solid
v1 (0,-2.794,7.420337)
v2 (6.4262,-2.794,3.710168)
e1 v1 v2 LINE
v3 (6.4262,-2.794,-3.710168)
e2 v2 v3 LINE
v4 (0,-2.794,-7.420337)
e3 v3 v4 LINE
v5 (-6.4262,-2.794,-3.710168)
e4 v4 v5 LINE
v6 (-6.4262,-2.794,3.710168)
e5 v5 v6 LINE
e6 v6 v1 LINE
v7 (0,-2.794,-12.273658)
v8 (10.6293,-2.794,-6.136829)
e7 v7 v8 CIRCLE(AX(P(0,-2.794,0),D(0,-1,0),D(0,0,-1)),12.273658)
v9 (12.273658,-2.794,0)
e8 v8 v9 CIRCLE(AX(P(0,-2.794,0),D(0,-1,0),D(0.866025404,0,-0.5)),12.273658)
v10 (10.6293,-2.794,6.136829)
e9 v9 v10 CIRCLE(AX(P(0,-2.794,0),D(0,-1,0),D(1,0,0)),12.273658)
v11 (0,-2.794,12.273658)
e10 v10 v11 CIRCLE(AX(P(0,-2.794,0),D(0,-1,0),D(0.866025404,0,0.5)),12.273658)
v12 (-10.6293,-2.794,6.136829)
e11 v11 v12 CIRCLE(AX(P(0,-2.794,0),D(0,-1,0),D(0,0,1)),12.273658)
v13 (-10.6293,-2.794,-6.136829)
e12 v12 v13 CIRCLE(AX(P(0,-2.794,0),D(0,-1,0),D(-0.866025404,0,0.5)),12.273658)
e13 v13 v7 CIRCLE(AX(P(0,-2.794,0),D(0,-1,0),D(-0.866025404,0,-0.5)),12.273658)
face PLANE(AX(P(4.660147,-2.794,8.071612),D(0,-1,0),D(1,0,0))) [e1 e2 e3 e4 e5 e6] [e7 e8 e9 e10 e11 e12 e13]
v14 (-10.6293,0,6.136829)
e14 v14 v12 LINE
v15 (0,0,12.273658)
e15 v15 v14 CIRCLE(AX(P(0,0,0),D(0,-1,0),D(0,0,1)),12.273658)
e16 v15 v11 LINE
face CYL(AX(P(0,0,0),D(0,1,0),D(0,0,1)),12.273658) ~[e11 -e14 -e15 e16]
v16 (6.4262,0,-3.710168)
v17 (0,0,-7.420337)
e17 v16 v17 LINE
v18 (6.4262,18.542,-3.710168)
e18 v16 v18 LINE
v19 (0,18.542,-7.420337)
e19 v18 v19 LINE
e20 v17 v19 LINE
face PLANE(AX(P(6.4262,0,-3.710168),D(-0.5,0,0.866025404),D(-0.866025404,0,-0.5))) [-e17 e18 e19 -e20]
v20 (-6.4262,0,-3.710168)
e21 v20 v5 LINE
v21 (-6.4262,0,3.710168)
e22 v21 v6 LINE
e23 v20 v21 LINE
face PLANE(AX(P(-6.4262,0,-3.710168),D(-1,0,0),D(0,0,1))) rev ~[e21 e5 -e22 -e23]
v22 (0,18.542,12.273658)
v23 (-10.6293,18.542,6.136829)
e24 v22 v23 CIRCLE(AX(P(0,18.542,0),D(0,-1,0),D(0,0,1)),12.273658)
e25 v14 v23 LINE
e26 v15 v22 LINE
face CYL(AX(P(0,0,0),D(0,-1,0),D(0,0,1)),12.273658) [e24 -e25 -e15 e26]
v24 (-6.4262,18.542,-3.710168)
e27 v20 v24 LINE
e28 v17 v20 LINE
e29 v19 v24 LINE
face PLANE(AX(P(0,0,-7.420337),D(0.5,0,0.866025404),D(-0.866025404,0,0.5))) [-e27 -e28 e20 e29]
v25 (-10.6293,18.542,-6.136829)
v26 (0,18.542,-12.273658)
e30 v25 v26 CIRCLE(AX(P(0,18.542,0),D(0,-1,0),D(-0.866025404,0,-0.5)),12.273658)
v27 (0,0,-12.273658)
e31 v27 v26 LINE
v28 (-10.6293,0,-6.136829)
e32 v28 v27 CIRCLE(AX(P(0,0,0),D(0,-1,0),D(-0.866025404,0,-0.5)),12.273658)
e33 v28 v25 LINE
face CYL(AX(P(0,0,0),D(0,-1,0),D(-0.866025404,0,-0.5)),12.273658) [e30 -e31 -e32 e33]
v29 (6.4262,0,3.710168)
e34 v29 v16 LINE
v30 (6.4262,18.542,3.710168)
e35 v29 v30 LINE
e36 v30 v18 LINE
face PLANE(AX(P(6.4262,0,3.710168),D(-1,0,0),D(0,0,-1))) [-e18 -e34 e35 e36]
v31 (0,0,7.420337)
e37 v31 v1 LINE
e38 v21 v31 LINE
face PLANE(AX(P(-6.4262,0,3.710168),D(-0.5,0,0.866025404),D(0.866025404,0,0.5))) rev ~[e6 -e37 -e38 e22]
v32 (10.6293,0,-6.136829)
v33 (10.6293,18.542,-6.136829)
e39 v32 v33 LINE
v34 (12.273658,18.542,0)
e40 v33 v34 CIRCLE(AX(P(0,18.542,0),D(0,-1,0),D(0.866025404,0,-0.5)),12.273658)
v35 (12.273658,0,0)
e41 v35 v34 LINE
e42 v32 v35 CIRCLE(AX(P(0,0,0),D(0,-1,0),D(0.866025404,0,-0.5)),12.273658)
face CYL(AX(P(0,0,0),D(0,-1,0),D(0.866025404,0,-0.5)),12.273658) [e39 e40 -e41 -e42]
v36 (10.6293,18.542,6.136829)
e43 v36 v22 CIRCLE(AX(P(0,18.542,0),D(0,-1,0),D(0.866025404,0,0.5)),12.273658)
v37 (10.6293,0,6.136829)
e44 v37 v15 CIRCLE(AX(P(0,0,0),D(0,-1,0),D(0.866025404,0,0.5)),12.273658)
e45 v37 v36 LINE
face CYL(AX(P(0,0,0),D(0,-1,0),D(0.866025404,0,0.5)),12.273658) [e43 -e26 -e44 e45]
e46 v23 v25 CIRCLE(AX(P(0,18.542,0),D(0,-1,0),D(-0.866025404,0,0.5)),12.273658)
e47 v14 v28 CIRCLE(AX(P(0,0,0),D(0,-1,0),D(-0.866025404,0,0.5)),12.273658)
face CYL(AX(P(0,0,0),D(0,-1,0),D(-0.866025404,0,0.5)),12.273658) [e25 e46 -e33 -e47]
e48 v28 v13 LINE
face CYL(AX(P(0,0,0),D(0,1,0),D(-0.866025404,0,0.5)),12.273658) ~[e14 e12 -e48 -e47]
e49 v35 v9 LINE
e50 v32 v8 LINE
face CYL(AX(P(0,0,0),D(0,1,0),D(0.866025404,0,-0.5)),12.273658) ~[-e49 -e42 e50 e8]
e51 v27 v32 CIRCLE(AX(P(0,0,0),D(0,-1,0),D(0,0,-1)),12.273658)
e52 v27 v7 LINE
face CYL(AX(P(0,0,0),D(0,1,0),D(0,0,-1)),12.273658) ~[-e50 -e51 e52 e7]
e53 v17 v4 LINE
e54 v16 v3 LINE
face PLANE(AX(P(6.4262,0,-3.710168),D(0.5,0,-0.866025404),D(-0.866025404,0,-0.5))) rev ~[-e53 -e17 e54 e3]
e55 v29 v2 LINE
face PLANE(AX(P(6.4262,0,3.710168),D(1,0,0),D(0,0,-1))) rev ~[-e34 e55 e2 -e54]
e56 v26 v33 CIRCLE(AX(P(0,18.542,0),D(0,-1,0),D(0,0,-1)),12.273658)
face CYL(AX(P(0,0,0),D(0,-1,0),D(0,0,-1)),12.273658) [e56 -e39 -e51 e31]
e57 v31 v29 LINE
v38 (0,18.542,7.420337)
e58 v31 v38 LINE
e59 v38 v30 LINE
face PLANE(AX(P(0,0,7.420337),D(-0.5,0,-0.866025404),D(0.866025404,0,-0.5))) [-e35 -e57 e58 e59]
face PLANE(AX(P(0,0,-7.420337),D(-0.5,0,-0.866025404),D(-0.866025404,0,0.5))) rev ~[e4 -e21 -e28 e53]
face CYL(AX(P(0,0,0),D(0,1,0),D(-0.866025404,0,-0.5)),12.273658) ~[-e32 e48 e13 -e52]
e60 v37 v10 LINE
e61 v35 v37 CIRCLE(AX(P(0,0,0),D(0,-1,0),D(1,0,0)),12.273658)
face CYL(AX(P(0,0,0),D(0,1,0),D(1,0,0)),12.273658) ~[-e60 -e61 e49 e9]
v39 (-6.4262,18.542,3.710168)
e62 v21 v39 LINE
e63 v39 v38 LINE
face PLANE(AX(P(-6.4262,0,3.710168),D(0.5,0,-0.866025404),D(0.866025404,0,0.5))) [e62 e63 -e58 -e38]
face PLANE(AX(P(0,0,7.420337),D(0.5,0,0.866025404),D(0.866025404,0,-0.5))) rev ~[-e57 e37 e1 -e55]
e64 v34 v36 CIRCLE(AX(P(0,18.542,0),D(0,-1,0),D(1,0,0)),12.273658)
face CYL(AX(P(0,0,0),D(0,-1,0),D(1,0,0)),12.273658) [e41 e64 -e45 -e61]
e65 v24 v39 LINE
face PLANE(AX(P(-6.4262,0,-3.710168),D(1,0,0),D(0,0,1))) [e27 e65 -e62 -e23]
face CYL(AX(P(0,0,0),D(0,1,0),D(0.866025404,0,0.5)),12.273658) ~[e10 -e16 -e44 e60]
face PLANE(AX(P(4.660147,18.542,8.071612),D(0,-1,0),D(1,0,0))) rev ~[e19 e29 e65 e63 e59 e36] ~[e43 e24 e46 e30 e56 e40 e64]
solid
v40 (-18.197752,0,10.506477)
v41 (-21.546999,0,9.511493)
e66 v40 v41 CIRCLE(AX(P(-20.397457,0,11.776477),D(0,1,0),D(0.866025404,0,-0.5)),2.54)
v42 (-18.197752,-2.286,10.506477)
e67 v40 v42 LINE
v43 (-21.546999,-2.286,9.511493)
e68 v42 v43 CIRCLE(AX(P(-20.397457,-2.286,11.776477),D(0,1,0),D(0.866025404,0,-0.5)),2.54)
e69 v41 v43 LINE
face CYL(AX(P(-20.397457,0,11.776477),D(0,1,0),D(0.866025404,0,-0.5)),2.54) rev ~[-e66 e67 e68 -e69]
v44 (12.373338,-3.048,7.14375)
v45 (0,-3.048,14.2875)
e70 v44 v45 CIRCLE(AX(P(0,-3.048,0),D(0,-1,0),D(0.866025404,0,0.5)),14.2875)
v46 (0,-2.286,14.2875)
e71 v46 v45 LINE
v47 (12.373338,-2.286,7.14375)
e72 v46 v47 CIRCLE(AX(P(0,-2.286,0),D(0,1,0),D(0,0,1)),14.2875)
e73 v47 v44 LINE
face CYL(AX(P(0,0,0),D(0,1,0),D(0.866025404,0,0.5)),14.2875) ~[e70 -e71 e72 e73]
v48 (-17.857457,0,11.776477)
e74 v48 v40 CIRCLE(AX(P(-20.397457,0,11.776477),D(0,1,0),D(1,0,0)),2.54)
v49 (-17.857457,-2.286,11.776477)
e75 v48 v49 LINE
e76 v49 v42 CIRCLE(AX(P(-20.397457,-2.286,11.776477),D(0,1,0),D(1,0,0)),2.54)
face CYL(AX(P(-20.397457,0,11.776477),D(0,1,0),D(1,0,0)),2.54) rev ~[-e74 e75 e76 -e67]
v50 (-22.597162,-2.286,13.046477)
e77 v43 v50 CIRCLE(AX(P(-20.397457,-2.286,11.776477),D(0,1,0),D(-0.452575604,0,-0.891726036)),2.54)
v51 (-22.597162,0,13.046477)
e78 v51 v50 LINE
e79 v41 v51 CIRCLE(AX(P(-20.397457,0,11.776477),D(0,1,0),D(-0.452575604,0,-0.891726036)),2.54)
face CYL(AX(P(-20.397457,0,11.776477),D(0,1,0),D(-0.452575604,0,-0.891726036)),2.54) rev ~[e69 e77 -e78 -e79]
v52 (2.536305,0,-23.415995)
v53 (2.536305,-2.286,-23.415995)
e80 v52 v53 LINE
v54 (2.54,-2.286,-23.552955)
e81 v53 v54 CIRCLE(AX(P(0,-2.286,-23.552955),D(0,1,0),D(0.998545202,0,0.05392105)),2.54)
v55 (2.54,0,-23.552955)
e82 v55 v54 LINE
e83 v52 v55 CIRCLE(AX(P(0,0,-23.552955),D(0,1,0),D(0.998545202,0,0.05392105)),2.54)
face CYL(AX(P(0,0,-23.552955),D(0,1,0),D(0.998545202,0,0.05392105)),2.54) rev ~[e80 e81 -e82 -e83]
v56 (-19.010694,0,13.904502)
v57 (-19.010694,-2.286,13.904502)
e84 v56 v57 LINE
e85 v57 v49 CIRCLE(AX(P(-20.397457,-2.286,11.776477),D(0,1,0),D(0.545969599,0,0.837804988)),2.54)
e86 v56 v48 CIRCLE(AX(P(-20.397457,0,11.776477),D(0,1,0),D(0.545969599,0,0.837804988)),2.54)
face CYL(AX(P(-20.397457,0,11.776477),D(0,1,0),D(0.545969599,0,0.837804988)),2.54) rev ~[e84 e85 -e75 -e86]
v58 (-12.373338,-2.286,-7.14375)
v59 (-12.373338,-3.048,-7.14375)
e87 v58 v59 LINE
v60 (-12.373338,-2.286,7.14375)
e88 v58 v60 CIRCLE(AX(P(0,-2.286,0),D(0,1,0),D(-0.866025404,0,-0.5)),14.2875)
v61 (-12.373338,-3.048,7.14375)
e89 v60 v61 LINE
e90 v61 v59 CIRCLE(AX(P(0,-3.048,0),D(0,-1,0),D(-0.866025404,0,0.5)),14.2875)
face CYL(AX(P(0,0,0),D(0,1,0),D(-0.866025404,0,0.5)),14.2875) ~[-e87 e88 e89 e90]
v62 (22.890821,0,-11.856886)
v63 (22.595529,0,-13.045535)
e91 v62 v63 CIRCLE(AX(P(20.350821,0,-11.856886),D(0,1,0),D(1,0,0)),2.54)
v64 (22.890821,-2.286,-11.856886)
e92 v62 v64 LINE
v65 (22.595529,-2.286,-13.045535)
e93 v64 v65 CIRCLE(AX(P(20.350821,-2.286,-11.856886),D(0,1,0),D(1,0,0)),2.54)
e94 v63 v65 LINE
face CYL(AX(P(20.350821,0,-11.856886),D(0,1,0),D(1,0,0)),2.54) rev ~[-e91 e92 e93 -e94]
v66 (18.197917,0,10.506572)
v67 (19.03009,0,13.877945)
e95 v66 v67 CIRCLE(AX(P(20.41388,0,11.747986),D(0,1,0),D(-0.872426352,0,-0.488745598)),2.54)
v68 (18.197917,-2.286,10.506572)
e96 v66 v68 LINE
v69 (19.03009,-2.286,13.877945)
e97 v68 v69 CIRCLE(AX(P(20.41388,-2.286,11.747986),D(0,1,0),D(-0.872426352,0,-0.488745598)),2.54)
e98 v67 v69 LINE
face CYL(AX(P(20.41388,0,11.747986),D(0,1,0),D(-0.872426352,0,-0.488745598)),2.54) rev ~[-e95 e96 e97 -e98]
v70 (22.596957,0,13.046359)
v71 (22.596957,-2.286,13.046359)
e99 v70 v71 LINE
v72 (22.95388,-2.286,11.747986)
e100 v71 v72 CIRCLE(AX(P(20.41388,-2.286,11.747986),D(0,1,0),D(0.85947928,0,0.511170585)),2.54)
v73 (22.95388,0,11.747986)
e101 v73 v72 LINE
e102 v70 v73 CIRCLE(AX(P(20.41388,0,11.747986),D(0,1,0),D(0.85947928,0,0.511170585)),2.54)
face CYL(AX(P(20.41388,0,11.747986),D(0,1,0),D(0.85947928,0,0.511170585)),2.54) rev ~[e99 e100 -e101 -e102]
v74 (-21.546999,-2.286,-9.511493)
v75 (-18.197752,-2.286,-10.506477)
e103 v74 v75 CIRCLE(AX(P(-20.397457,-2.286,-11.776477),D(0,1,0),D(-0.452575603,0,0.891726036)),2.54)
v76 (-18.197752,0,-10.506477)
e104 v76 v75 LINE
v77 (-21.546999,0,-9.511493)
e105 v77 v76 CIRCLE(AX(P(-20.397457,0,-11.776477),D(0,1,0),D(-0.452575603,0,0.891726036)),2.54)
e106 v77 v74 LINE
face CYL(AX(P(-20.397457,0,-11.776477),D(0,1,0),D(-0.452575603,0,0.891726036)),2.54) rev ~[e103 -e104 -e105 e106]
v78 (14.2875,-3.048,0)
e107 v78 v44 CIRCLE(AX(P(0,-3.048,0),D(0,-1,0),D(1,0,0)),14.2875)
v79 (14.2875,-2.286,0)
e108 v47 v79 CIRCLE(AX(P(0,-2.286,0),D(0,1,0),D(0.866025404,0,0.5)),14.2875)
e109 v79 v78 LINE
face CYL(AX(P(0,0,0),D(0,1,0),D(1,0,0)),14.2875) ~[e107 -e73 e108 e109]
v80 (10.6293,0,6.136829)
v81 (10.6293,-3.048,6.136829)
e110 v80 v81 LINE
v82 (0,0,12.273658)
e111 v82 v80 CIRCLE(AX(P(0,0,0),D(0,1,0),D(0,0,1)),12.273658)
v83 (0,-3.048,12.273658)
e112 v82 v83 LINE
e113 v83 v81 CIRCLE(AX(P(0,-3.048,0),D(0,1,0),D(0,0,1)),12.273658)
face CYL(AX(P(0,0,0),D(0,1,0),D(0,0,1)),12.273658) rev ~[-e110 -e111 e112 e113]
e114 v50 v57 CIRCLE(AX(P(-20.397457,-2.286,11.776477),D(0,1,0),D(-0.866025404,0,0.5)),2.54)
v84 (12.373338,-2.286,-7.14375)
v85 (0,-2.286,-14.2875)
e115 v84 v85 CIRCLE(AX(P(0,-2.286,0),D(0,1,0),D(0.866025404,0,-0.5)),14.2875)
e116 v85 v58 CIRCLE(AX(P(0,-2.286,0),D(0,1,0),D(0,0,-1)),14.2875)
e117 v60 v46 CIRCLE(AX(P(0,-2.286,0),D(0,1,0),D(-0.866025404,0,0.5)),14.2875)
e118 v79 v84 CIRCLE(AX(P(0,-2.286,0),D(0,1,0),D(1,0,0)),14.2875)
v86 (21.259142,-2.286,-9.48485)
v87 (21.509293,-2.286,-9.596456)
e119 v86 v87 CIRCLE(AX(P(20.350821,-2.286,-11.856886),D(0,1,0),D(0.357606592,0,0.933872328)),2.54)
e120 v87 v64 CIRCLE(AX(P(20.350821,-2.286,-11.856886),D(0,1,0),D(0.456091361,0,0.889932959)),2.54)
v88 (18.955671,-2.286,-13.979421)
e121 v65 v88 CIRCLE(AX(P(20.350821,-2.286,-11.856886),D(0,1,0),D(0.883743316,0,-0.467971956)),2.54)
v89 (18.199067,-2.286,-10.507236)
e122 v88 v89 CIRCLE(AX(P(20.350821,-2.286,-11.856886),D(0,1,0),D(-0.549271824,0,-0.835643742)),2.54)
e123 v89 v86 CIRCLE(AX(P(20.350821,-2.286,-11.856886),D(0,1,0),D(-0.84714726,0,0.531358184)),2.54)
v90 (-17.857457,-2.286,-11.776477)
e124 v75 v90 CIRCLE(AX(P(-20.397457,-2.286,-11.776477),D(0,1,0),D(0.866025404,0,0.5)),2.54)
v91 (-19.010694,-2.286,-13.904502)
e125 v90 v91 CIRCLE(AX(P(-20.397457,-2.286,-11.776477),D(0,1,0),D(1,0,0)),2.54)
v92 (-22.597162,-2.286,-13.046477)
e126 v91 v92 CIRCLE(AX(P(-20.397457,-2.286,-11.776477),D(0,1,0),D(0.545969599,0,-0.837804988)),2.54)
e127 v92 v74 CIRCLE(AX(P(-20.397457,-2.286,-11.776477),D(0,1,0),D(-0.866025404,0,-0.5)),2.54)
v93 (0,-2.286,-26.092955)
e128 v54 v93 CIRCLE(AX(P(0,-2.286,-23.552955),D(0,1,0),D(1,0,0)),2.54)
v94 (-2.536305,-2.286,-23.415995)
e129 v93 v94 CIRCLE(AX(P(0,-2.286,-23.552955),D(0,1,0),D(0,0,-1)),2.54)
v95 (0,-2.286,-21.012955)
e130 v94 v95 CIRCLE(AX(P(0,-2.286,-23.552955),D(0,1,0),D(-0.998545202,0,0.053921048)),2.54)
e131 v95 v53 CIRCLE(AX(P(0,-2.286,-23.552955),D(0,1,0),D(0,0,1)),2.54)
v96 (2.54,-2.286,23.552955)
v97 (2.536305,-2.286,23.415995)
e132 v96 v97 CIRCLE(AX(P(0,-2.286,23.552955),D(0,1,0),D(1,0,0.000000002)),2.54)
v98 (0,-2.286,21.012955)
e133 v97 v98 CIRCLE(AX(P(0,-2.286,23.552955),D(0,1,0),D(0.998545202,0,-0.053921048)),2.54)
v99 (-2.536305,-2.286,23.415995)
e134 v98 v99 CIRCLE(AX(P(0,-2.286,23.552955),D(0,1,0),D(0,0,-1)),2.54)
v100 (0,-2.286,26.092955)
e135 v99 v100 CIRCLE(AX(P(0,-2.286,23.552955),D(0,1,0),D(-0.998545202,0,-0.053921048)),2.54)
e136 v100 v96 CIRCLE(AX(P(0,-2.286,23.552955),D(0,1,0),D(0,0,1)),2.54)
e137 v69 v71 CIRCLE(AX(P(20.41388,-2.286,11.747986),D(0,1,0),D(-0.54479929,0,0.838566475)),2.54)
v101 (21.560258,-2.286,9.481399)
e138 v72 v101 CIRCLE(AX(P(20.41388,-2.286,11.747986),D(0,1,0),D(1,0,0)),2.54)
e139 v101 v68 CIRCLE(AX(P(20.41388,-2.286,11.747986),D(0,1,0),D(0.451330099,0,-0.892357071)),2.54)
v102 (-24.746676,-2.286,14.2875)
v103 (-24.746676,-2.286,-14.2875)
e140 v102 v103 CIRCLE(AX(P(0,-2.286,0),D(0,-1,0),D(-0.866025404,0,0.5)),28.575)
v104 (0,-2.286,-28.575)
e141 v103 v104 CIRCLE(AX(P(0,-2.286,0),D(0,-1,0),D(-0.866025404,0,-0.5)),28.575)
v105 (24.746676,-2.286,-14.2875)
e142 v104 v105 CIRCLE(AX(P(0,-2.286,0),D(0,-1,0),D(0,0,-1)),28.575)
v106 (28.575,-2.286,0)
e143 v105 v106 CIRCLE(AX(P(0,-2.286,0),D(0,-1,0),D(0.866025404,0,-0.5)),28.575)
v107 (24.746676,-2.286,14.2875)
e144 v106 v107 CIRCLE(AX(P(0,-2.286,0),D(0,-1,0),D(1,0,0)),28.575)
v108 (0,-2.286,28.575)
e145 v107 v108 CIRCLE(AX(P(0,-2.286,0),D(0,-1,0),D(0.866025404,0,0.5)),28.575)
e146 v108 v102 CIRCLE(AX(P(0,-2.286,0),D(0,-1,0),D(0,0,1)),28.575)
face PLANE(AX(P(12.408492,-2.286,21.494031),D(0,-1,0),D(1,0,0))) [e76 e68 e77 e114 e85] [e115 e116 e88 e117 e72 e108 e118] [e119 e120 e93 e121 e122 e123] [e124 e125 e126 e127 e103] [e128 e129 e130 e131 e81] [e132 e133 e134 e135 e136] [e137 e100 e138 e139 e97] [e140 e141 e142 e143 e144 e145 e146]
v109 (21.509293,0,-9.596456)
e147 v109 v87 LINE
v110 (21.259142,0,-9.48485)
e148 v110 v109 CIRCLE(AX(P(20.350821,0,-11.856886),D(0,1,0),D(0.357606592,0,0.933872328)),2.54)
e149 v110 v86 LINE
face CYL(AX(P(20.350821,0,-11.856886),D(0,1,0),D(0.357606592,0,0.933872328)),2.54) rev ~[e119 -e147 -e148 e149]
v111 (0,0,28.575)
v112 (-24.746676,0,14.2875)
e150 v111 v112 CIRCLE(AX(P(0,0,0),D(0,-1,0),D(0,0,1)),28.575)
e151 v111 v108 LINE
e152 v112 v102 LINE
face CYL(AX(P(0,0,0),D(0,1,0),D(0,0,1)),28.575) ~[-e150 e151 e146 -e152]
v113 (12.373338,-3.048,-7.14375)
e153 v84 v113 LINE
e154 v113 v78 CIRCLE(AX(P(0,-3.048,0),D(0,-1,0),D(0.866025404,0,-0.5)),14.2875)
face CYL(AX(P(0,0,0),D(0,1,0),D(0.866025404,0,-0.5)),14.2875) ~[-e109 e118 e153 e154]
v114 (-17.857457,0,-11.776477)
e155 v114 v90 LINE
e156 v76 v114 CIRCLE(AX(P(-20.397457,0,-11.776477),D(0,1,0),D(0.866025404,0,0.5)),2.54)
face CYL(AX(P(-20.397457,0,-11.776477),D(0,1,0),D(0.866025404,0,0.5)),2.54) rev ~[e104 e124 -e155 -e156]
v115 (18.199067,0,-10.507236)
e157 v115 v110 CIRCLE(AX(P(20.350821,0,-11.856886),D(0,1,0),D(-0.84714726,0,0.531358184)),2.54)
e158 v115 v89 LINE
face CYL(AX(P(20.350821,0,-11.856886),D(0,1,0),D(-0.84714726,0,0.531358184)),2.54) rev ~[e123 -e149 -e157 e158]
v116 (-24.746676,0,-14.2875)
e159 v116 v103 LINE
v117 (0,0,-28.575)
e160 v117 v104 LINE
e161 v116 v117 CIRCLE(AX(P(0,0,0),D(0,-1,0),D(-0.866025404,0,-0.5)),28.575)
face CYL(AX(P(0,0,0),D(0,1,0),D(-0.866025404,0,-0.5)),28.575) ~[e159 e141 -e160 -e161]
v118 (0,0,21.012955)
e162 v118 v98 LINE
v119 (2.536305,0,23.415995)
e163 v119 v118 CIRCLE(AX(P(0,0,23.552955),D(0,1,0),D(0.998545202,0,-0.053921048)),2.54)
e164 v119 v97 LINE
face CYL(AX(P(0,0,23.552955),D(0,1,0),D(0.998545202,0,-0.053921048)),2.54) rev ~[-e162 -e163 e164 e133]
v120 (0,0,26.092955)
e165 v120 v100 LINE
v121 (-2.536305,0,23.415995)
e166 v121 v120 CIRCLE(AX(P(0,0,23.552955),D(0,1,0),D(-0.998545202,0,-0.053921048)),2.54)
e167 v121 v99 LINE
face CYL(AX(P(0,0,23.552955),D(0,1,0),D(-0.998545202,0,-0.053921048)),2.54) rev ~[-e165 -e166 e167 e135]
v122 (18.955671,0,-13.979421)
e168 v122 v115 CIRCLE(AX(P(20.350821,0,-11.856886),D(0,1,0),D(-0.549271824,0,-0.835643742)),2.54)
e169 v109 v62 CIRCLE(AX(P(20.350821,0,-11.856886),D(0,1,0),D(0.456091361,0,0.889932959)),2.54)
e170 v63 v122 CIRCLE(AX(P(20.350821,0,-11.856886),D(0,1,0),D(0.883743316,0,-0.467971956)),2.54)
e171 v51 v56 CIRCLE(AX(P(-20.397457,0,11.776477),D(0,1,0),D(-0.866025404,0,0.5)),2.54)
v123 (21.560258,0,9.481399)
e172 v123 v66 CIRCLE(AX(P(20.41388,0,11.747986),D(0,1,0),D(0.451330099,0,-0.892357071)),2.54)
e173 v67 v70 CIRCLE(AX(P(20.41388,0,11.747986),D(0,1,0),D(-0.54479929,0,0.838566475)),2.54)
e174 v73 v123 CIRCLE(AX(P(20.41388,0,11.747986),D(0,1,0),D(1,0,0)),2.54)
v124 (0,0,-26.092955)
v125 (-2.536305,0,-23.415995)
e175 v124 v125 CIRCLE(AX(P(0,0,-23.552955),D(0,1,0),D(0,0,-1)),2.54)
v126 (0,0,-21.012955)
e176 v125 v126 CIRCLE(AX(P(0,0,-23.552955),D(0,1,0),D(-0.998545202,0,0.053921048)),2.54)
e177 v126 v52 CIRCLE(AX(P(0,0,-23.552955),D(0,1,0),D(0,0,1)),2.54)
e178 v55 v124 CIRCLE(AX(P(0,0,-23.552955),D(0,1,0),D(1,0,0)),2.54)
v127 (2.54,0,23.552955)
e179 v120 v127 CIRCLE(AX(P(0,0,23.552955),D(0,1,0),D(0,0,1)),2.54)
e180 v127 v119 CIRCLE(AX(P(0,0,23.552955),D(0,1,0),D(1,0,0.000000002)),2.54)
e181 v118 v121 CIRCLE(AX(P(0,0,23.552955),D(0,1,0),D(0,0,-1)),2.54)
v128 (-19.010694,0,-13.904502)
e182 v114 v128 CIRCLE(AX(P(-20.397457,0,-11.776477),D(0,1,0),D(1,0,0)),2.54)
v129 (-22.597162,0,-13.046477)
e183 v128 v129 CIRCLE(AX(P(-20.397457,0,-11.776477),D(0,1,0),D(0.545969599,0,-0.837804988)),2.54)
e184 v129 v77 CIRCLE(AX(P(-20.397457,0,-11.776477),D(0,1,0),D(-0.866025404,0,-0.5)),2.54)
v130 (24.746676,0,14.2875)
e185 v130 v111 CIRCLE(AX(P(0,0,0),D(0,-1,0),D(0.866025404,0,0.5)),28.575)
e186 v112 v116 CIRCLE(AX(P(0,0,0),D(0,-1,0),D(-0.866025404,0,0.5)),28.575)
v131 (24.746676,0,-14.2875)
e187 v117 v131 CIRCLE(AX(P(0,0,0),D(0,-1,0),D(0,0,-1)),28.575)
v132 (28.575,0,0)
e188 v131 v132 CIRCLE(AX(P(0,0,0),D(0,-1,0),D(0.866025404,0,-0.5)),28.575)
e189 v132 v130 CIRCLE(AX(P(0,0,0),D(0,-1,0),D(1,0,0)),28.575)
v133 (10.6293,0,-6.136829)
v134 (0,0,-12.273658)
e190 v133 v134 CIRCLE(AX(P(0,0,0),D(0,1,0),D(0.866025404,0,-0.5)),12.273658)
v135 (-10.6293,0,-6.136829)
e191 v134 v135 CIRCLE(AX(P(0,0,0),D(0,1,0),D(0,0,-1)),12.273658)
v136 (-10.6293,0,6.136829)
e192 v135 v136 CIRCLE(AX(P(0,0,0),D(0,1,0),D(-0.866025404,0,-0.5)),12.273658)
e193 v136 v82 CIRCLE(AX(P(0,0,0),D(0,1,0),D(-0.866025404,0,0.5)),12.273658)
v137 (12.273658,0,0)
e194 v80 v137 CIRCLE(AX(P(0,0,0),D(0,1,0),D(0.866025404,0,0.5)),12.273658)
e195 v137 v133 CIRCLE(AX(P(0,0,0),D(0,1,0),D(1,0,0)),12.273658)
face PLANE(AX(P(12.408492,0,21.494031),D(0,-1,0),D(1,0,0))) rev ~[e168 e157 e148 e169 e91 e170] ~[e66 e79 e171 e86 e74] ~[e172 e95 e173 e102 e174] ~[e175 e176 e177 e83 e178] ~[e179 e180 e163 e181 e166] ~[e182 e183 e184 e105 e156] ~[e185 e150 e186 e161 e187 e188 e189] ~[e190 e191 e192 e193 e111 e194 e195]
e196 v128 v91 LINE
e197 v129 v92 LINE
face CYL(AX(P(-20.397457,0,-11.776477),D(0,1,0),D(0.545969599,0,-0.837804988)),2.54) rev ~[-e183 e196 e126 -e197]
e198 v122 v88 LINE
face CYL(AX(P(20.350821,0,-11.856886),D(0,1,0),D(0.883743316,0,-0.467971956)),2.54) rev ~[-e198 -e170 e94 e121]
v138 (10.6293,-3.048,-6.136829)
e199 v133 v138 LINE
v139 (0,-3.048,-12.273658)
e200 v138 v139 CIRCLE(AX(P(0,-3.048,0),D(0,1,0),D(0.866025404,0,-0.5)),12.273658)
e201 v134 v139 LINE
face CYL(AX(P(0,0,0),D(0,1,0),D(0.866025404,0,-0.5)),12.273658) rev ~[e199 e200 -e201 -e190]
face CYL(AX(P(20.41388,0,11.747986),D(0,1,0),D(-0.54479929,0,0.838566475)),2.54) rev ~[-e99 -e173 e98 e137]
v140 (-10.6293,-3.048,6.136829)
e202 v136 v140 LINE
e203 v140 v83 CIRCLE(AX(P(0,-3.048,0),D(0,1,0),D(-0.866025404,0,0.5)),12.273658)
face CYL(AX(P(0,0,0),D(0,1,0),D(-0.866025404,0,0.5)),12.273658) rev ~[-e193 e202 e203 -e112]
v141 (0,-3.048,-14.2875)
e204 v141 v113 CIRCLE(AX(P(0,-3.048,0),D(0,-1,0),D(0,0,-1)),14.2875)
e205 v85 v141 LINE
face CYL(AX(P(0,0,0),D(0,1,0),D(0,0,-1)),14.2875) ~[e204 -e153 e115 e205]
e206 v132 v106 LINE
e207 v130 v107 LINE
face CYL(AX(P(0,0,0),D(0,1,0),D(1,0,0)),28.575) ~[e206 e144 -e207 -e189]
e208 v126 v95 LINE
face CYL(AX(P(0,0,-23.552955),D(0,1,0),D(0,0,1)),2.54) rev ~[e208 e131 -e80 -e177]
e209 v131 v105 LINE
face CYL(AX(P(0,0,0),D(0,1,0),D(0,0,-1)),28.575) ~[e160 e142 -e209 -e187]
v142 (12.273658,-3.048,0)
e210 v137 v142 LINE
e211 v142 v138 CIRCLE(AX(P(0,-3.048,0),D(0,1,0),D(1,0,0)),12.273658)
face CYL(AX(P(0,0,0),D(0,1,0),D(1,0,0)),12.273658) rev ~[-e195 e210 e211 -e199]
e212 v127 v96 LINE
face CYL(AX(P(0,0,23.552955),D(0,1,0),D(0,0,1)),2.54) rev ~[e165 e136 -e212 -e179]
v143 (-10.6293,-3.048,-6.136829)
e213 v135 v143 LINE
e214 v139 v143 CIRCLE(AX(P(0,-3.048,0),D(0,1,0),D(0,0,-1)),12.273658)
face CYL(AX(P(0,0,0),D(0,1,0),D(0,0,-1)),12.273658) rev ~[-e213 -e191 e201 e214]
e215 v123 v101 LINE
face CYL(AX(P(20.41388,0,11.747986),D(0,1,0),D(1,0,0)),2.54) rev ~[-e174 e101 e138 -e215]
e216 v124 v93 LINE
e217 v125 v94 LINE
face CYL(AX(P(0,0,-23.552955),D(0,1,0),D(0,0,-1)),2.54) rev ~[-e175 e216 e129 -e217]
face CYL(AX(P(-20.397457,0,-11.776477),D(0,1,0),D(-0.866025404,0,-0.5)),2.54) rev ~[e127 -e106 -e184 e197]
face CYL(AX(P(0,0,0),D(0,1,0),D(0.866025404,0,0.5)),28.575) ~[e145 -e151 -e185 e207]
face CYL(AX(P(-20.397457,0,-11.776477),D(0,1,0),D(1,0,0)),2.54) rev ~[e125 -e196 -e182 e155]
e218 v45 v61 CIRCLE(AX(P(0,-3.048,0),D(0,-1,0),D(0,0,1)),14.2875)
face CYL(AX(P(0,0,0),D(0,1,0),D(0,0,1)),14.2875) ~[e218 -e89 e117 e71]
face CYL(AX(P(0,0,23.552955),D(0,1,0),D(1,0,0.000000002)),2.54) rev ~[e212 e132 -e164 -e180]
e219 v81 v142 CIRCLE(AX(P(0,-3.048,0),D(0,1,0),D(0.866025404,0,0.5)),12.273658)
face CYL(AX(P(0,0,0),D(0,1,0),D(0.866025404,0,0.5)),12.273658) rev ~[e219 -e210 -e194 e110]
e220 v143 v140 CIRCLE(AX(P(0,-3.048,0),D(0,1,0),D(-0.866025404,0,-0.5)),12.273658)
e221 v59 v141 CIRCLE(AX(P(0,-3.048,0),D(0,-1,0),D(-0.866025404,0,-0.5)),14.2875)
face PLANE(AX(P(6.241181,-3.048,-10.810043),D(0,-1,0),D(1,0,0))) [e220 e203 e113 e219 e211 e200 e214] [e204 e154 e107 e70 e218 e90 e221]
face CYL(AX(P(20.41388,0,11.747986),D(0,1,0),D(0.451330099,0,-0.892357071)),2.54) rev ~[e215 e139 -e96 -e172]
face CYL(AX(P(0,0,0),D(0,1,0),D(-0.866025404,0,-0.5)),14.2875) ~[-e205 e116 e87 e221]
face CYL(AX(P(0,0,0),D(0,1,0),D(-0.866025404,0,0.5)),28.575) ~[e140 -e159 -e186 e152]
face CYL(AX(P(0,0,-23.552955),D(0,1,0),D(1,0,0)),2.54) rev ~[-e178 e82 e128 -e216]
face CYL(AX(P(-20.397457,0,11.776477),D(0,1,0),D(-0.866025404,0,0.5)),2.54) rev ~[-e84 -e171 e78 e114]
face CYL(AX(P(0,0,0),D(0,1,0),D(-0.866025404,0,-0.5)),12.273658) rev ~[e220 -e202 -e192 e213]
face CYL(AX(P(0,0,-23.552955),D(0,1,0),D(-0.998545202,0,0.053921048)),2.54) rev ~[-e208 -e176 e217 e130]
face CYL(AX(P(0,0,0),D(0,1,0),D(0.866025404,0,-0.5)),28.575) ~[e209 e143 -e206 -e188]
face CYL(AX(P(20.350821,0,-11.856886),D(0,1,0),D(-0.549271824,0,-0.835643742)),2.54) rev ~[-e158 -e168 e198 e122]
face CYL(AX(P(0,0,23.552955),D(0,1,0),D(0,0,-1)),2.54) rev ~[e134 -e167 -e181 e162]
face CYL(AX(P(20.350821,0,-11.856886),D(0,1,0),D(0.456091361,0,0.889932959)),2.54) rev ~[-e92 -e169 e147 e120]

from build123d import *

# Parameters (mm, degrees)
F1_DEPTH = 18.542
F2_DEPTH = 3.048
F3_DEPTH = 2.286
F4_DEPTH = 2.286
F6_DEPTH = 2.794


# Not quite as in the source:
# - a feature of the source that left no trace in its solid (it failed there, or was rolled back) is left out


with BuildPart() as f1:
    # F0 (on Front) → F1 (new body)
    with BuildSketch(Plane.XZ):
        with BuildLine():
            Line((6.4262, 3.7101682999), (10.6292995539, 6.1368289587))
            ThreePointArc((10.6292995539, 6.1368289587), (6.1368289587, 10.6292995539), (0, 12.2736579174))
            Line((0, 12.2736579174), (0, 7.4203365997))
            Line((0, 7.4203365997), (6.4262, 3.7101682999))
        make_face()
        with BuildLine():
            ThreePointArc((12.2736579174, 0), (11.8554431655, 3.1766564221), (10.6292995539, 6.1368289587))
            Line((10.6292995539, 6.1368289587), (6.4262, 3.7101682999))
            Line((6.4262, 3.7101682999), (6.4262, -2.8670745859))
            Line((6.4262, -2.8670745859), (6.4262, -3.7101682999))
            Line((6.4262, -3.7101682999), (10.6292995539, -6.1368289587))
            ThreePointArc((10.6292995539, -6.1368289587), (11.8554431655, -3.1766564221), (12.2736579174, 0))
        make_face()
        with BuildLine():
            ThreePointArc((0, -12.2736579174), (6.1368289587, -10.6292995539), (10.6292995539, -6.1368289587))
            Line((10.6292995539, -6.1368289587), (6.4262, -3.7101682999))
            Line((6.4262, -3.7101682999), (0, -7.4203365997))
            Line((0, -7.4203365997), (0, -12.2736579174))
        make_face()
        with BuildLine():
            Line((0, 7.4203365997), (0, 12.2736579174))
            ThreePointArc((0, 12.2736579174), (-6.1368289587, 10.6292995539), (-10.6292995539, 6.1368289587))
            Line((-10.6292995539, 6.1368289587), (-6.4262, 3.7101682999))
            Line((-6.4262, 3.7101682999), (0, 7.4203365997))
        make_face()
        with BuildLine():
            ThreePointArc((-10.6292995539, -6.1368289587), (-6.1368289587, -10.6292995539), (0, -12.2736579174))
            Line((0, -12.2736579174), (0, -7.4203365997))
            Line((0, -7.4203365997), (-6.4262, -3.7101682999))
            Line((-6.4262, -3.7101682999), (-10.6292995539, -6.1368289587))
        make_face()
        with BuildLine():
            Line((-6.4262, 3.7101682999), (-10.6292995539, 6.1368289587))
            ThreePointArc((-10.6292995539, 6.1368289587), (-12.2736579174, 0), (-10.6292995539, -6.1368289587))
            Line((-10.6292995539, -6.1368289587), (-6.4262, -3.7101682999))
            Line((-6.4262, -3.7101682999), (-6.4262, 3.7101682999))
        make_face()
    extrude(amount=-F1_DEPTH)

    # F0 (on Front) → F6 (join)
    with BuildSketch(Plane.XZ):
        with BuildLine():
            Line((6.4262, 3.7101682999), (10.6292995539, 6.1368289587))
            ThreePointArc((10.6292995539, 6.1368289587), (6.1368289587, 10.6292995539), (0, 12.2736579174))
            Line((0, 12.2736579174), (0, 7.4203365997))
            Line((0, 7.4203365997), (6.4262, 3.7101682999))
        make_face()
        with BuildLine():
            ThreePointArc((12.2736579174, 0), (11.8554431655, 3.1766564221), (10.6292995539, 6.1368289587))
            Line((10.6292995539, 6.1368289587), (6.4262, 3.7101682999))
            Line((6.4262, 3.7101682999), (6.4262, -2.8670745859))
            Line((6.4262, -2.8670745859), (6.4262, -3.7101682999))
            Line((6.4262, -3.7101682999), (10.6292995539, -6.1368289587))
            ThreePointArc((10.6292995539, -6.1368289587), (11.8554431655, -3.1766564221), (12.2736579174, 0))
        make_face()
        with BuildLine():
            ThreePointArc((0, -12.2736579174), (6.1368289587, -10.6292995539), (10.6292995539, -6.1368289587))
            Line((10.6292995539, -6.1368289587), (6.4262, -3.7101682999))
            Line((6.4262, -3.7101682999), (0, -7.4203365997))
            Line((0, -7.4203365997), (0, -12.2736579174))
        make_face()
        with BuildLine():
            Line((0, 7.4203365997), (0, 12.2736579174))
            ThreePointArc((0, 12.2736579174), (-6.1368289587, 10.6292995539), (-10.6292995539, 6.1368289587))
            Line((-10.6292995539, 6.1368289587), (-6.4262, 3.7101682999))
            Line((-6.4262, 3.7101682999), (0, 7.4203365997))
        make_face()
        with BuildLine():
            ThreePointArc((-10.6292995539, -6.1368289587), (-6.1368289587, -10.6292995539), (0, -12.2736579174))
            Line((0, -12.2736579174), (0, -7.4203365997))
            Line((0, -7.4203365997), (-6.4262, -3.7101682999))
            Line((-6.4262, -3.7101682999), (-10.6292995539, -6.1368289587))
        make_face()
        with BuildLine():
            Line((-6.4262, 3.7101682999), (-10.6292995539, 6.1368289587))
            ThreePointArc((-10.6292995539, 6.1368289587), (-12.2736579174, 0), (-10.6292995539, -6.1368289587))
            Line((-10.6292995539, -6.1368289587), (-6.4262, -3.7101682999))
            Line((-6.4262, -3.7101682999), (-6.4262, 3.7101682999))
        make_face()
    extrude(amount=F6_DEPTH)


with BuildPart() as f2:
    # F0 (on Front) → F2 (new body)
    with BuildSketch(Plane.XZ):
        with BuildLine():
            ThreePointArc((0, -14.2875), (7.14375, -12.3733379566), (12.3733379566, -7.14375))
            Line((12.3733379566, -7.14375), (10.6292995539, -6.1368289587))
            ThreePointArc((10.6292995539, -6.1368289587), (6.1368289587, -10.6292995539), (0, -12.2736579174))
            Line((0, -12.2736579174), (0, -14.2875))
        make_face()
        with BuildLine():
            ThreePointArc((-12.3733379566, -7.14375), (-7.14375, -12.3733379566), (0, -14.2875))
            Line((0, -14.2875), (0, -12.2736579174))
            ThreePointArc((0, -12.2736579174), (-6.1368289587, -10.6292995539), (-10.6292995539, -6.1368289587))
            Line((-10.6292995539, -6.1368289587), (-12.3733379566, -7.14375))
        make_face()
        with BuildLine():
            Line((-10.6292995539, 6.1368289587), (-12.3733379566, 7.14375))
            ThreePointArc((-12.3733379566, 7.14375), (-14.2875, 0), (-12.3733379566, -7.14375))
            Line((-12.3733379566, -7.14375), (-10.6292995539, -6.1368289587))
            ThreePointArc((-10.6292995539, -6.1368289587), (-12.2736579174, 0), (-10.6292995539, 6.1368289587))
        make_face()
        with BuildLine():
            Line((0, 12.2736579174), (0, 14.2875))
            ThreePointArc((0, 14.2875), (-7.14375, 12.3733379566), (-12.3733379566, 7.14375))
            Line((-12.3733379566, 7.14375), (-10.6292995539, 6.1368289587))
            ThreePointArc((-10.6292995539, 6.1368289587), (-6.1368289587, 10.6292995539), (0, 12.2736579174))
        make_face()
        with BuildLine():
            Line((10.6292995539, 6.1368289587), (12.3733379566, 7.14375))
            ThreePointArc((12.3733379566, 7.14375), (7.14375, 12.3733379566), (0, 14.2875))
            Line((0, 14.2875), (0, 12.2736579174))
            ThreePointArc((0, 12.2736579174), (6.1368289587, 10.6292995539), (10.6292995539, 6.1368289587))
        make_face()
        with BuildLine():
            ThreePointArc((14.2875, 0), (13.8006652431, 3.6978771069), (12.3733379566, 7.14375))
            Line((12.3733379566, 7.14375), (10.6292995539, 6.1368289587))
            ThreePointArc((10.6292995539, 6.1368289587), (11.8554431655, 3.1766564221), (12.2736579174, 0))
            ThreePointArc((12.2736579174, 0), (11.8554431655, -3.1766564221), (10.6292995539, -6.1368289587))
            Line((10.6292995539, -6.1368289587), (12.3733379566, -7.14375))
            ThreePointArc((12.3733379566, -7.14375), (13.8006652431, -3.6978771069), (14.2875, 0))
        make_face()
    extrude(amount=F2_DEPTH)

    # F0 (on Front) → F3 (join)
    with BuildSketch(Plane.XZ):
        with BuildLine():
            ThreePointArc((2.5363048132, -23.415995125), (11.7362040327, -20.4206558343), (18.9556707318, -13.9794211936))
            ThreePointArc((18.9556707318, -13.9794211936), (17.8690577157, -12.3976727234), (18.1990671233, -10.5072363026))
            Line((18.1990671233, -10.5072363026), (12.3733379566, -7.14375))
            ThreePointArc((12.3733379566, -7.14375), (7.14375, -12.3733379566), (0, -14.2875))
            Line((0, -14.2875), (0, -21.0129545875))
            ThreePointArc((0, -21.0129545875), (1.7469577793, -21.7091166019), (2.5363048132, -23.415995125))
        make_face()
        with BuildLine():
            ThreePointArc((-19.0106942266, -13.9045019625), (-11.7764772938, -20.397457007), (-2.5363048132, -23.415995125))
            ThreePointArc((-2.5363048132, -23.415995125), (-1.7469577793, -21.7091166019), (0, -21.0129545875))
            Line((0, -21.0129545875), (0, -14.2875))
            ThreePointArc((0, -14.2875), (-7.14375, -12.3733379566), (-12.3733379566, -7.14375))
            Line((-12.3733379566, -7.14375), (-18.1977524814, -10.5064772938))
            ThreePointArc((-18.1977524814, -10.5064772938), (-17.9440054082, -11.1190769192), (-17.857457007, -11.7764772938))
            ThreePointArc((-17.857457007, -11.7764772938), (-18.1643003329, -12.9866885434), (-19.0106942266, -13.9045019625))
        make_face()
        with BuildLine():
            ThreePointArc((-18.1977524814, 10.5064772938), (-19.6741253606, 9.3416484847), (-21.5469990398, 9.5114931625))
            ThreePointArc((-21.5469990398, 9.5114931625), (-23.5529545875, 0), (-21.5469990398, -9.5114931625))
            ThreePointArc((-21.5469990398, -9.5114931625), (-19.6741253606, -9.3416484847), (-18.1977524814, -10.5064772938))
            Line((-18.1977524814, -10.5064772938), (-12.3733379566, -7.14375))
            ThreePointArc((-12.3733379566, -7.14375), (-14.2875, 0), (-12.3733379566, 7.14375))
            Line((-12.3733379566, 7.14375), (-18.1977524814, 10.5064772938))
        make_face()
        with BuildLine():
            ThreePointArc((0, 21.0129545875), (-1.7469577793, 21.7091166019), (-2.5363048132, 23.415995125))
            ThreePointArc((-2.5363048132, 23.415995125), (-11.7764772938, 20.397457007), (-19.0106942266, 13.9045019625))
            ThreePointArc((-19.0106942266, 13.9045019625), (-18.1643003329, 12.9866885434), (-17.857457007, 11.7764772938))
            ThreePointArc((-17.857457007, 11.7764772938), (-17.9440054082, 11.1190769192), (-18.1977524814, 10.5064772938))
            Line((-18.1977524814, 10.5064772938), (-12.3733379566, 7.14375))
            ThreePointArc((-12.3733379566, 7.14375), (-7.14375, 12.3733379566), (0, 14.2875))
            Line((0, 14.2875), (0, 21.0129545875))
        make_face()
        with BuildLine():
            ThreePointArc((18.1979169714, 10.5065722621), (17.9478924637, 12.356678067), (19.0300897095, 13.8779449289))
            ThreePointArc((19.0300897095, 13.8779449289), (11.790714294, 20.3892306436), (2.5363048132, 23.415995125))
            ThreePointArc((2.5363048132, 23.415995125), (1.7469577793, 21.7091166019), (0, 21.0129545875))
            Line((0, 21.0129545875), (0, 14.2875))
            ThreePointArc((0, 14.2875), (7.14375, 12.3733379566), (12.3733379566, 7.14375))
            Line((12.3733379566, 7.14375), (18.1979169714, 10.5065722621))
        make_face()
        with BuildLine():
            ThreePointArc((23.5529545875, 0), (23.0493975606, 4.8442689742), (21.5602583585, 9.4813991223))
            ThreePointArc((21.5602583585, 9.4813991223), (19.6731048169, 9.3184074624), (18.1979169714, 10.5065722621))
            Line((18.1979169714, 10.5065722621), (12.3733379566, 7.14375))
            ThreePointArc((12.3733379566, 7.14375), (13.8006652431, 3.6978771069), (14.2875, 0))
            ThreePointArc((14.2875, 0), (13.8006652431, -3.6978771069), (12.3733379566, -7.14375))
            Line((12.3733379566, -7.14375), (18.1990671233, -10.5072363026))
            ThreePointArc((18.1990671233, -10.5072363026), (19.5459299692, -9.4477887138), (21.2591419094, -9.484850376))
            ThreePointArc((21.2591419094, -9.484850376), (21.3857231383, -9.5372788153), (21.5092932207, -9.5964563744))
            ThreePointArc((21.5092932207, -9.5964563744), (23.0363742399, -4.9058262996), (23.5529545875, 0))
        make_face()
    extrude(amount=F3_DEPTH)

    # F0 (on Front) → F4 (join)
    with BuildSketch(Plane.XZ):
        with BuildLine():
            Line((22.596957278, 13.0463593673), (24.7466759131, 14.2875))
            ThreePointArc((24.7466759131, 14.2875), (14.2875, 24.7466759131), (0, 28.575))
            Line((0, 28.575), (0, 26.0929545875))
            ThreePointArc((0, 26.0929545875), (1.7960512242, 25.3490058117), (2.54, 23.5529545875))
            ThreePointArc((2.54, 23.5529545875), (2.5390760353, 23.4844499366), (2.5363048132, 23.415995125))
            ThreePointArc((2.5363048132, 23.415995125), (11.790714294, 20.3892306436), (19.0300897095, 13.8779449289))
            ThreePointArc((19.0300897095, 13.8779449289), (20.9905935558, 14.2216476119), (22.596957278, 13.0463593673))
        make_face()
        with BuildLine():
            Line((0, 26.0929545875), (0, 28.575))
            ThreePointArc((0, 28.575), (-14.2875, 24.7466759131), (-24.7466759131, 14.2875))
            Line((-24.7466759131, 14.2875), (-22.5971615326, 13.0464772938))
            ThreePointArc((-22.5971615326, 13.0464772938), (-20.9884478303, 14.2467667194), (-19.0106942266, 13.9045019625))
            ThreePointArc((-19.0106942266, 13.9045019625), (-11.7764772938, 20.397457007), (-2.5363048132, 23.415995125))
            ThreePointArc((-2.5363048132, 23.415995125), (-1.8438379857, 25.2999123668), (0, 26.0929545875))
        make_face()
        with BuildLine():
            Line((-22.5971615326, 13.0464772938), (-24.7466759131, 14.2875))
            ThreePointArc((-24.7466759131, 14.2875), (-28.575, 0), (-24.7466759131, -14.2875))
            Line((-24.7466759131, -14.2875), (-22.5971615326, -13.0464772938))
            ThreePointArc((-22.5971615326, -13.0464772938), (-22.832285816, -11.0531456474), (-21.5469990398, -9.5114931625))
            ThreePointArc((-21.5469990398, -9.5114931625), (-23.5529545875, 0), (-21.5469990398, 9.5114931625))
            ThreePointArc((-21.5469990398, 9.5114931625), (-22.832285816, 11.0531456474), (-22.5971615326, 13.0464772938))
        make_face()
        with BuildLine():
            ThreePointArc((-24.7466759131, -14.2875), (-14.2875, -24.7466759131), (0, -28.575))
            Line((0, -28.575), (0, -26.0929545875))
            ThreePointArc((0, -26.0929545875), (-1.8438379857, -25.2999123668), (-2.5363048132, -23.415995125))
            ThreePointArc((-2.5363048132, -23.415995125), (-11.7764772938, -20.397457007), (-19.0106942266, -13.9045019625))
            ThreePointArc((-19.0106942266, -13.9045019625), (-20.9884478303, -14.2467667194), (-22.5971615326, -13.0464772938))
            Line((-22.5971615326, -13.0464772938), (-24.7466759131, -14.2875))
        make_face()
        with BuildLine():
            ThreePointArc((0, -28.575), (14.2875, -24.7466759131), (24.7466759131, -14.2875))
            Line((24.7466759131, -14.2875), (22.5955291864, -13.0455348583))
            ThreePointArc((22.5955291864, -13.0455348583), (20.9820683001, -14.3171964463), (18.9556707318, -13.9794211936))
            ThreePointArc((18.9556707318, -13.9794211936), (11.7362040327, -20.4206558343), (2.5363048132, -23.415995125))
            ThreePointArc((2.5363048132, -23.415995125), (2.5390760353, -23.4844499366), (2.54, -23.5529545875))
            ThreePointArc((2.54, -23.5529545875), (1.7960512242, -25.3490058117), (0, -26.0929545875))
            Line((0, -26.0929545875), (0, -28.575))
        make_face()
        with BuildLine():
            ThreePointArc((24.7466759131, -14.2875), (27.6013304862, -7.3957542138), (28.575, 0))
            ThreePointArc((28.575, 0), (27.6013304862, 7.3957542138), (24.7466759131, 14.2875))
            Line((24.7466759131, 14.2875), (22.596957278, 13.0463593673))
            ThreePointArc((22.596957278, 13.0463593673), (22.8630243002, 12.4212555209), (22.9538799063, 11.7479860816))
            ThreePointArc((22.9538799063, 11.7479860816), (22.5776036951, 10.4176104333), (21.5602583585, 9.4813991223))
            ThreePointArc((21.5602583585, 9.4813991223), (23.0493975606, 4.8442689742), (23.5529545875, 0))
            ThreePointArc((23.5529545875, 0), (23.0363742399, -4.9058262996), (21.5092932207, -9.5964563744))
            ThreePointArc((21.5092932207, -9.5964563744), (22.5180912242, -10.5322954019), (22.8908211645, -11.8568860891))
            ThreePointArc((22.8908211645, -11.8568860891), (22.8158930069, -12.4692755176), (22.5955291864, -13.0455348583))
            Line((22.5955291864, -13.0455348583), (24.7466759131, -14.2875))
        make_face()
    extrude(amount=F4_DEPTH)


solid = Compound([f1.part, f2.part])
